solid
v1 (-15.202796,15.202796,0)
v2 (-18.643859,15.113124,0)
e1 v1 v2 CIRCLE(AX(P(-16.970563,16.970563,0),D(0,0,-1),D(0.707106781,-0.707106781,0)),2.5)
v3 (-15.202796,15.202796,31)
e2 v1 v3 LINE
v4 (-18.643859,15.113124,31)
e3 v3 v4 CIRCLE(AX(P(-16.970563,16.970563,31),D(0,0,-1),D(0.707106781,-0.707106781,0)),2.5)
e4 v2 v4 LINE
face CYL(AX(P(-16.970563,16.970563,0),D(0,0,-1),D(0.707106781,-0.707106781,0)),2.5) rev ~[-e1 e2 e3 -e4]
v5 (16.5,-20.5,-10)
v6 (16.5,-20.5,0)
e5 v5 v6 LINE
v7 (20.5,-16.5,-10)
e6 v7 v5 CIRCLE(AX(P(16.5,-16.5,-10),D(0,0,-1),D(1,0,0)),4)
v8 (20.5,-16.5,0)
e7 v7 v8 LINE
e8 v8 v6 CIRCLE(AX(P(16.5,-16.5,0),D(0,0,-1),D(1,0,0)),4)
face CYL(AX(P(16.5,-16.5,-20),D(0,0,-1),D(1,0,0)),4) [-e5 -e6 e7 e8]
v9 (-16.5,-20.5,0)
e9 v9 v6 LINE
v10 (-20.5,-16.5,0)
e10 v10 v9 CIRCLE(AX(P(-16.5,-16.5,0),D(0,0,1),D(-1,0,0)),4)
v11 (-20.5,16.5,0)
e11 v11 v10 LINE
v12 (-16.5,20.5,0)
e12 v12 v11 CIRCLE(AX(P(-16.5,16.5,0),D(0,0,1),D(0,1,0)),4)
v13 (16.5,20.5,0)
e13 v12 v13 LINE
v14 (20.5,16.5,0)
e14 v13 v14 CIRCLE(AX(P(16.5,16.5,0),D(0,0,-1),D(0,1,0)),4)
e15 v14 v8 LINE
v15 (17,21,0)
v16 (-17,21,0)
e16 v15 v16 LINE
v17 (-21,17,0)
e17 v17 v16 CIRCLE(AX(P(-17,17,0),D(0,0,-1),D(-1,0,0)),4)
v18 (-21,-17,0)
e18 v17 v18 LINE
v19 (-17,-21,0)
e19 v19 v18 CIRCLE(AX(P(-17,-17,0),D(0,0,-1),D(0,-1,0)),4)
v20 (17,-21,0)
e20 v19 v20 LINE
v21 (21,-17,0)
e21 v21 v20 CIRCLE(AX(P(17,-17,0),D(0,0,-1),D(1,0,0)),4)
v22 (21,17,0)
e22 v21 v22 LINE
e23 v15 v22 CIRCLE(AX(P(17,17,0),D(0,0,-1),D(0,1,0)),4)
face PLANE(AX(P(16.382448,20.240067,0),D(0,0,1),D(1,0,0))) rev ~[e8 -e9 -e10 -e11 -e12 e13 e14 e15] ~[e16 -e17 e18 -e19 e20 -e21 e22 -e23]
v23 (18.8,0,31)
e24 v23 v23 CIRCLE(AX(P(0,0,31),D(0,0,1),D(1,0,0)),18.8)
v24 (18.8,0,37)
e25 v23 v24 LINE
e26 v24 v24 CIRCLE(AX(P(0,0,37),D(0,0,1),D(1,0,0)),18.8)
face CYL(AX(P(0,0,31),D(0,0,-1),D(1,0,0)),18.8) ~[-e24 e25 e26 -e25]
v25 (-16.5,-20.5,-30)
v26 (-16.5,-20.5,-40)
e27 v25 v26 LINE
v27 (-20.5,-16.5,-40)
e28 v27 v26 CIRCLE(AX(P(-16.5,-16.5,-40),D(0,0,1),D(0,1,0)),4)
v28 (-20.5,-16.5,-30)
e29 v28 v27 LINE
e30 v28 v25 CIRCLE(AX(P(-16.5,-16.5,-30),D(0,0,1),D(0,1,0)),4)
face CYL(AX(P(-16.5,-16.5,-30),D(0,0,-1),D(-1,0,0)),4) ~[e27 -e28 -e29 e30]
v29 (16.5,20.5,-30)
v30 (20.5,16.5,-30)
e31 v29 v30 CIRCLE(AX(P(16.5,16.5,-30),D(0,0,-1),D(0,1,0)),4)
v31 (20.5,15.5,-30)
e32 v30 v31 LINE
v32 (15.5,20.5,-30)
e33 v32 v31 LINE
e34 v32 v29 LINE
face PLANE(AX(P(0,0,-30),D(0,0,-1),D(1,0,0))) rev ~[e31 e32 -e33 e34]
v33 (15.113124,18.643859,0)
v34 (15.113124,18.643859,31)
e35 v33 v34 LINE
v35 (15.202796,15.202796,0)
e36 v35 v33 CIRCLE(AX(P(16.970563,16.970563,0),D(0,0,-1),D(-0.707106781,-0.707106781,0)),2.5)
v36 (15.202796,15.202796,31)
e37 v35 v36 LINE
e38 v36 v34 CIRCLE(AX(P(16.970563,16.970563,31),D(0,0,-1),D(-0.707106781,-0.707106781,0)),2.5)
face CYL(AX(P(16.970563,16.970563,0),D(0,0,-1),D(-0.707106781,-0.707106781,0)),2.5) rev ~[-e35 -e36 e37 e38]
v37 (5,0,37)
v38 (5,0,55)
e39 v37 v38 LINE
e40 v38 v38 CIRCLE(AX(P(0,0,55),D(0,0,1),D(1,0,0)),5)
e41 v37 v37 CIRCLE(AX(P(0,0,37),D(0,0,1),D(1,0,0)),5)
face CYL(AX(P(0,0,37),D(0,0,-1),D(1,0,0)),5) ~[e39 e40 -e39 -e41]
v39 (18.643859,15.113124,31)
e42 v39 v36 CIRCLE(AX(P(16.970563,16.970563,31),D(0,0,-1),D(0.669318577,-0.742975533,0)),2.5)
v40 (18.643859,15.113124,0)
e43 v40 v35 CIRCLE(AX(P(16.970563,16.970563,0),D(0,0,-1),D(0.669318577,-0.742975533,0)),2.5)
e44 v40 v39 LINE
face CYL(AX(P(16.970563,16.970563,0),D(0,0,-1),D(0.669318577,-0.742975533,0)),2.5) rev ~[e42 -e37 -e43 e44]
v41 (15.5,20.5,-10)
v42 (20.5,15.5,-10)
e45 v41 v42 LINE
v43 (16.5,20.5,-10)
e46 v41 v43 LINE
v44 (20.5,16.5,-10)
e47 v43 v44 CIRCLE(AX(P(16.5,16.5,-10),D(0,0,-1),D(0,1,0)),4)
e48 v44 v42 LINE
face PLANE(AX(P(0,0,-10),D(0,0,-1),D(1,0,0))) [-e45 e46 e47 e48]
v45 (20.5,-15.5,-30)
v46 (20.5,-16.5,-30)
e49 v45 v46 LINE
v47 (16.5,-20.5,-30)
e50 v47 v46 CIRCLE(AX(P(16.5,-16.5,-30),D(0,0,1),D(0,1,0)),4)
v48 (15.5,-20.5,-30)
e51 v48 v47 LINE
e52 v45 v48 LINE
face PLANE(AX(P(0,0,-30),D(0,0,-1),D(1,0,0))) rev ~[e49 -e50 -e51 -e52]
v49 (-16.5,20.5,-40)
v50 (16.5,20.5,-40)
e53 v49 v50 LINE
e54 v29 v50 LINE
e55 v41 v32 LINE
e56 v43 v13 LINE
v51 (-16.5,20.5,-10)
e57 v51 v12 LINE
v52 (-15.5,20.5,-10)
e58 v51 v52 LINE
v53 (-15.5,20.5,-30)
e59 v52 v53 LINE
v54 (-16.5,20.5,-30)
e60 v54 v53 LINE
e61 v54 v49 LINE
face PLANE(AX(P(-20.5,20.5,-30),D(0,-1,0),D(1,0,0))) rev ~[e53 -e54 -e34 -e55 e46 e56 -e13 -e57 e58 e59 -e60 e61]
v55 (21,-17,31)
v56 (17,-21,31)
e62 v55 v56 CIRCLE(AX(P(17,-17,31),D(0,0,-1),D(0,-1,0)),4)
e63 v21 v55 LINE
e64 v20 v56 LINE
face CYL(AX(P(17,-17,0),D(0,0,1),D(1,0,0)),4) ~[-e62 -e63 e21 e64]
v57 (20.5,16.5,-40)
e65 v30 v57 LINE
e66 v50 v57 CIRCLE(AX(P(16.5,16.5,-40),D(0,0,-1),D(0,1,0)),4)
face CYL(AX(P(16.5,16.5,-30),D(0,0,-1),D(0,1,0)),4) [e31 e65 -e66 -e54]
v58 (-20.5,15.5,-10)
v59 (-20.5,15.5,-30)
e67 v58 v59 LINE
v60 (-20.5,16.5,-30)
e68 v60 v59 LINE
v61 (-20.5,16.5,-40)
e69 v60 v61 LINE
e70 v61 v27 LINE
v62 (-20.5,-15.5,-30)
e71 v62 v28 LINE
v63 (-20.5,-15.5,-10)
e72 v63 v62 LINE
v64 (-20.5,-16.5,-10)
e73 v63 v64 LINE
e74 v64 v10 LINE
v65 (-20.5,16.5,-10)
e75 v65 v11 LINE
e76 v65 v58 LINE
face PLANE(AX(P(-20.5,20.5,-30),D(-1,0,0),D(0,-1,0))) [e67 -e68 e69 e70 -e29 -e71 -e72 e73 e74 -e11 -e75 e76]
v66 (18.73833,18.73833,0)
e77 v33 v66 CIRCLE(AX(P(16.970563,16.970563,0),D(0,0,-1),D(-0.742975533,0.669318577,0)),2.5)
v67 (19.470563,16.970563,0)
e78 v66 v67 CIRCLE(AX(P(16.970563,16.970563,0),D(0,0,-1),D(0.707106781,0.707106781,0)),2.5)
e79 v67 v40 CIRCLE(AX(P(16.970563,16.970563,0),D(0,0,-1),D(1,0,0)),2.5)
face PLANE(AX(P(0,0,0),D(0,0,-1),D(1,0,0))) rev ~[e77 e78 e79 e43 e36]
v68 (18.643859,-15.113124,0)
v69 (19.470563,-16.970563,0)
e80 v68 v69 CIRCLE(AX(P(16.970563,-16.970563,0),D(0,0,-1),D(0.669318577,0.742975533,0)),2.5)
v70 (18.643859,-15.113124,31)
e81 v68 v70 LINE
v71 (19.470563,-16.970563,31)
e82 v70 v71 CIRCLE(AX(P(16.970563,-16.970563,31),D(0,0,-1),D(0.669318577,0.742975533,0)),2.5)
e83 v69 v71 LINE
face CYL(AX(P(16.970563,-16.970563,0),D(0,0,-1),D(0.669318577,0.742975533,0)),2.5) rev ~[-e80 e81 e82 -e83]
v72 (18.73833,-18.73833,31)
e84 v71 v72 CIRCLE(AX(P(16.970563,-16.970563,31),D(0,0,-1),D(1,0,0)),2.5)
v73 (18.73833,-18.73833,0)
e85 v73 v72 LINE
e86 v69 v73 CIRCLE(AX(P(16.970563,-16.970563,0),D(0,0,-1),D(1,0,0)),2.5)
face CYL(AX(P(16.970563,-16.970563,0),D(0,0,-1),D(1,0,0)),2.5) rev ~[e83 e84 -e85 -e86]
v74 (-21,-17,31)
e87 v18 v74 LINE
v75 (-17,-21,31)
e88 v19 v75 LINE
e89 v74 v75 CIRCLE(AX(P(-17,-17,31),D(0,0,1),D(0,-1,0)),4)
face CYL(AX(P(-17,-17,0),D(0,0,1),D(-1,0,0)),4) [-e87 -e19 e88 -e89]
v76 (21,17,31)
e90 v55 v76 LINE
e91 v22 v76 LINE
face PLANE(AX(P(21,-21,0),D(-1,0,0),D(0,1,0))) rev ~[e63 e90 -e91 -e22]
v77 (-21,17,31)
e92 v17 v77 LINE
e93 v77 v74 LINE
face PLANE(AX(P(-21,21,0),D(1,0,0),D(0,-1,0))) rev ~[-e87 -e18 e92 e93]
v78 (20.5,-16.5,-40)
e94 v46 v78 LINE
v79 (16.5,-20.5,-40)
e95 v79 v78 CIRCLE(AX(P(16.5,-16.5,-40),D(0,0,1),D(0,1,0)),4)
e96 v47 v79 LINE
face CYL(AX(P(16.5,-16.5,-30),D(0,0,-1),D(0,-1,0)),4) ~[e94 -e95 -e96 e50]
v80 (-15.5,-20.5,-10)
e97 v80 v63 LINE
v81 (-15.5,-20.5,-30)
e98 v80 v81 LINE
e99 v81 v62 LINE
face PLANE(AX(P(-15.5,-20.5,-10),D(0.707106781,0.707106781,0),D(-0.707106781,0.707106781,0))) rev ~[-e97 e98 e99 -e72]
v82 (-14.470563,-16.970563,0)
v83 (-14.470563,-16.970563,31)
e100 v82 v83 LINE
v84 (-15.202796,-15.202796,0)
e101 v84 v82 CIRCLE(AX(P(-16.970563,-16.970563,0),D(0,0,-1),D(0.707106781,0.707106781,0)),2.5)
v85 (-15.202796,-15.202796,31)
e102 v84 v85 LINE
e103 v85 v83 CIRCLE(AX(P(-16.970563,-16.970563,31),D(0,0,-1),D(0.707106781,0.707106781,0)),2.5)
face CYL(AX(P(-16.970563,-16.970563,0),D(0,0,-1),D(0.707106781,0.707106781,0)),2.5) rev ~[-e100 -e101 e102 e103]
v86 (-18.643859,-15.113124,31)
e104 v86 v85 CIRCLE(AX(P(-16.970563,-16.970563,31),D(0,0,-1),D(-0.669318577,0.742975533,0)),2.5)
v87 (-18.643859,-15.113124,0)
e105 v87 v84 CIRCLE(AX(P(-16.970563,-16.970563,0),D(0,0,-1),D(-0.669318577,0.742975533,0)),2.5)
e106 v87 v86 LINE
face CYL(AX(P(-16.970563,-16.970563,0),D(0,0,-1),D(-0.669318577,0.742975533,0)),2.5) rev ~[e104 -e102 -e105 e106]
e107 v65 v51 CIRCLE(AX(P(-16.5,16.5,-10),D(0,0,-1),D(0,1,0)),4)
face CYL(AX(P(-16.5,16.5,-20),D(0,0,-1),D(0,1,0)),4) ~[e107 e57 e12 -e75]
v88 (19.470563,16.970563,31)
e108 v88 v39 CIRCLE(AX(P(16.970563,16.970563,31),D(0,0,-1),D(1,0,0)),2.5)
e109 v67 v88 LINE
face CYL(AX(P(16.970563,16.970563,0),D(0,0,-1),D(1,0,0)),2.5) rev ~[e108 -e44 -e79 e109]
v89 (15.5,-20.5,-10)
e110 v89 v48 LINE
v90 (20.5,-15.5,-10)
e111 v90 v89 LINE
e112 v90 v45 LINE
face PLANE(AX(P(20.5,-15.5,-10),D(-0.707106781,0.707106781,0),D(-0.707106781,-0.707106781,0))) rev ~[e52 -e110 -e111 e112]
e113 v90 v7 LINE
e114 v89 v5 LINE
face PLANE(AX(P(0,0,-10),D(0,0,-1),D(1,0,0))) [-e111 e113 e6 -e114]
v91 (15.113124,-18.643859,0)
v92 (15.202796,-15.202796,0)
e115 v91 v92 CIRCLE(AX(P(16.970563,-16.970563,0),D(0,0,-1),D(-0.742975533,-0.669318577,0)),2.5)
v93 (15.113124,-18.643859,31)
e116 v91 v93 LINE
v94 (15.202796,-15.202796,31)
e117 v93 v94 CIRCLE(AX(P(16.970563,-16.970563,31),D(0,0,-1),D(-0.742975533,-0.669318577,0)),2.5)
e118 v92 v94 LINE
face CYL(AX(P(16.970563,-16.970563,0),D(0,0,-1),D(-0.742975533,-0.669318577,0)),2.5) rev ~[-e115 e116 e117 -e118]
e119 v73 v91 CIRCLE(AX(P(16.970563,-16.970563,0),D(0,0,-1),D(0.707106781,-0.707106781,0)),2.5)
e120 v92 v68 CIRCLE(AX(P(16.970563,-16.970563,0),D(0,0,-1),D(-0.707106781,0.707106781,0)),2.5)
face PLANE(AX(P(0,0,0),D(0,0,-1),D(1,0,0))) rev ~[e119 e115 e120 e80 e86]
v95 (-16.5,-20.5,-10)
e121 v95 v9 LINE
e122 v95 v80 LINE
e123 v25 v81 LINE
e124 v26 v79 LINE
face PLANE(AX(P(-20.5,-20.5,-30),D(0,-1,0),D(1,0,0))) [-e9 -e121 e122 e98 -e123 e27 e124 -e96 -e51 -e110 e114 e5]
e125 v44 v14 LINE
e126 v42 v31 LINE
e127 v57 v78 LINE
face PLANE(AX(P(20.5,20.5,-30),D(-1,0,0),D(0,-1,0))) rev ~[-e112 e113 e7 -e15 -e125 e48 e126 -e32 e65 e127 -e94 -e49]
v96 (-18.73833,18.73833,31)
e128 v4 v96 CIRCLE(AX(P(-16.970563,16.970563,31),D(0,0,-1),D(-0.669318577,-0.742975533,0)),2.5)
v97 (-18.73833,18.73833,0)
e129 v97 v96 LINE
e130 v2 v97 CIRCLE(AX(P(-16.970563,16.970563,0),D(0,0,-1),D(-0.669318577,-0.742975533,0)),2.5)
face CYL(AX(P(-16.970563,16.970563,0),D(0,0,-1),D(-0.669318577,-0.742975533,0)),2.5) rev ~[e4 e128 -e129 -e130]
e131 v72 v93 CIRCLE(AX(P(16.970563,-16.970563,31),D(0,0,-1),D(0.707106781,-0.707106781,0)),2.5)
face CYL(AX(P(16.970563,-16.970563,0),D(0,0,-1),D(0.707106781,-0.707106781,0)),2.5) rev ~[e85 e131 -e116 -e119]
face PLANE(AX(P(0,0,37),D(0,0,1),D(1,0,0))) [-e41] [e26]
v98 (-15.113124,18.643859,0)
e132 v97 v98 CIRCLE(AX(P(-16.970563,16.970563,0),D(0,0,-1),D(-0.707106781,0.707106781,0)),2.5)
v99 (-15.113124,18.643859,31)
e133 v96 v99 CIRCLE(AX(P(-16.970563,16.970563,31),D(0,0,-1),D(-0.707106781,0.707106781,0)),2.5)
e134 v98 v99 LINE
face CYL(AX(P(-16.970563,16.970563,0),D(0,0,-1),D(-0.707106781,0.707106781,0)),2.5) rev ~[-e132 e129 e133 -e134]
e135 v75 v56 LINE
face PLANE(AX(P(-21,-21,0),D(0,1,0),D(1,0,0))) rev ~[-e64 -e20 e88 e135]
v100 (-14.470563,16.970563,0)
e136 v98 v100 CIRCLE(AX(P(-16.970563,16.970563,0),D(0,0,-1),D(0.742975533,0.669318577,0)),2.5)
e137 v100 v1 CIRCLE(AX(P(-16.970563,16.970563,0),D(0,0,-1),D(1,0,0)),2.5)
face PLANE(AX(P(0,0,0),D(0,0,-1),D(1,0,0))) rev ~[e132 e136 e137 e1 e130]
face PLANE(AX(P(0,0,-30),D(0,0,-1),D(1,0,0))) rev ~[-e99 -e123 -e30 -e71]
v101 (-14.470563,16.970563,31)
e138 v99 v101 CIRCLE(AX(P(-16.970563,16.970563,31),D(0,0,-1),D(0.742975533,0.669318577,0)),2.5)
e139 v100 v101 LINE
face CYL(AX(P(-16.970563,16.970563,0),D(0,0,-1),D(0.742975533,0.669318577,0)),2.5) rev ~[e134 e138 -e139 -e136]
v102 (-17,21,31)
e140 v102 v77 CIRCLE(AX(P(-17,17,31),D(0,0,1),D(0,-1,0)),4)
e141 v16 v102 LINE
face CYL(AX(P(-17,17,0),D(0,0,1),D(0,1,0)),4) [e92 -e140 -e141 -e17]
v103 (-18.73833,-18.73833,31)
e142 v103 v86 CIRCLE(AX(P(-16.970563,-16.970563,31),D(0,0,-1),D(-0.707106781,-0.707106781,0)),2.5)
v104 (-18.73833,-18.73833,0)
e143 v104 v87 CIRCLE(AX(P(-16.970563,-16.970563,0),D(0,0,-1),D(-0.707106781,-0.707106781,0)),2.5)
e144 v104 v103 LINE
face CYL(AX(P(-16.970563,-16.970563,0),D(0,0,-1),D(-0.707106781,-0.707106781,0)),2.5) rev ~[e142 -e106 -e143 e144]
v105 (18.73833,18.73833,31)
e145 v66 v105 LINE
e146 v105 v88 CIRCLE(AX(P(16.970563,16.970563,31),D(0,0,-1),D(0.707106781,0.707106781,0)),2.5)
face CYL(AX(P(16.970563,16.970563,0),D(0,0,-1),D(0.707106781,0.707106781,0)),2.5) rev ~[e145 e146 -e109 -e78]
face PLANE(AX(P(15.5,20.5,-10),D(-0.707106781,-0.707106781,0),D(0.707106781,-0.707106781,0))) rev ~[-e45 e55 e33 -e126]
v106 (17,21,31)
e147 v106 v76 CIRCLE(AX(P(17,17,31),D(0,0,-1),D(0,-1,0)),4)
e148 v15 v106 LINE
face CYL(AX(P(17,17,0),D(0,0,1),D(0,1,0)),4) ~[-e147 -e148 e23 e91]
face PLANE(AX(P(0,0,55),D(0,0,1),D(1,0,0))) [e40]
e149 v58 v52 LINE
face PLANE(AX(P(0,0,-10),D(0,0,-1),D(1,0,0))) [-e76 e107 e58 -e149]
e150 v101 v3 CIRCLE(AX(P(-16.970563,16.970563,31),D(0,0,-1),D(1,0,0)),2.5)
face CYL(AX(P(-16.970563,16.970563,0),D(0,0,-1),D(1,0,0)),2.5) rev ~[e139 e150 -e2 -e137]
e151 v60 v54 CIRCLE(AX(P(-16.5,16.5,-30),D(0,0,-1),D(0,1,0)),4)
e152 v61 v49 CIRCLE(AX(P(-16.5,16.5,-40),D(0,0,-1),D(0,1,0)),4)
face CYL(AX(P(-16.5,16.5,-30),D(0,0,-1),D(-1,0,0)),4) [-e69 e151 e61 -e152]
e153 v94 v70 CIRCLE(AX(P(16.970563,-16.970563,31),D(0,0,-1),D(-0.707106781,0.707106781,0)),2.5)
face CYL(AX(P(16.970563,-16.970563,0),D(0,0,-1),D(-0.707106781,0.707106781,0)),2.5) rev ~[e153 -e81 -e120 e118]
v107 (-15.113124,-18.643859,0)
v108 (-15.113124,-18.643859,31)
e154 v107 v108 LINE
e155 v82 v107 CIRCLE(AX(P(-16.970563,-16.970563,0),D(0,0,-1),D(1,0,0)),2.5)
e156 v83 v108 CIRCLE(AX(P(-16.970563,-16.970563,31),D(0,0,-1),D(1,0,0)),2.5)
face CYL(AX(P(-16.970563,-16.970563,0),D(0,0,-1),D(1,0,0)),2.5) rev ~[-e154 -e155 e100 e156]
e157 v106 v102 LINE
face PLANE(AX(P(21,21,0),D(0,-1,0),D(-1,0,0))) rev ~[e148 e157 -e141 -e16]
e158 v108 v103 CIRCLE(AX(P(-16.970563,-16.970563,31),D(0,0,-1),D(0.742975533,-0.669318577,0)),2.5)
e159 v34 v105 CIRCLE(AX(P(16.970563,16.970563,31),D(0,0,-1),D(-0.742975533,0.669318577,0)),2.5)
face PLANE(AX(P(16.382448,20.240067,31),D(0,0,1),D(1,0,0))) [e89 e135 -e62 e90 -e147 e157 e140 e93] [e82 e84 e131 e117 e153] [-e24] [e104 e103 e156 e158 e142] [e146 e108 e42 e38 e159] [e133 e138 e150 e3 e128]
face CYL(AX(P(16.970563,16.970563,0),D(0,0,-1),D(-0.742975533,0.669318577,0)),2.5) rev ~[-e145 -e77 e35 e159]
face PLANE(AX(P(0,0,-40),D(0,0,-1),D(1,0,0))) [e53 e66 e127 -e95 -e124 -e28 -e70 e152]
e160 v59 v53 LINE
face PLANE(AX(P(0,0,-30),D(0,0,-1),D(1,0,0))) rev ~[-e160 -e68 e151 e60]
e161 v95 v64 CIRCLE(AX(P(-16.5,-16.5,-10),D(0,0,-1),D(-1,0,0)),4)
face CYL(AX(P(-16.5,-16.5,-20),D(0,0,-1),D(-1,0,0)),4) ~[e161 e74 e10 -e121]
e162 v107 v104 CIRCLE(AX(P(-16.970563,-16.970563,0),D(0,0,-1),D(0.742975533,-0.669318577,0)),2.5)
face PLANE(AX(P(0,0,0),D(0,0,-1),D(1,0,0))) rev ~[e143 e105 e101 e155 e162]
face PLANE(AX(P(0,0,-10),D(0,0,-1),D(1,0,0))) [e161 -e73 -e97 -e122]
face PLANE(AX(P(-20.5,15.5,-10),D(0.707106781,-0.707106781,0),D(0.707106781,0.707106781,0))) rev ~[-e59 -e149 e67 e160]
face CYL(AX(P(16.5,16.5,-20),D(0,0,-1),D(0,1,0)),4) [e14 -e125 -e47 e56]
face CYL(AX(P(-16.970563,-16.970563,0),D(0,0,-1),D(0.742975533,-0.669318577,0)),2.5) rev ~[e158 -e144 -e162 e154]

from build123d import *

# Parameters (mm, degrees)
F1_DEPTH     = 31
F2_R         = 18.8
F3_DEPTH     = 6
F4_R         = 5
F5_DEPTH     = 18
F6_R         = 4
F8_W         = 41
F8_H         = 41
F9_DEPTH     = 10
F10_T1_DEPTH = 20
F12_DEPTH    = 20
F13_W        = 41
F13_H        = 41
F14_DEPTH    = 10
F15_R        = 4


# Not quite as in the source:
# - a fillet or chamfer that OpenCascade refuses, or shapes differently, is made with other operations: its cross-section is extruded or revolved along the edge and cut away or added


with BuildPart() as f1:
    # F0 (on Top) → F1 (new body)
    with BuildSketch(Plane.XY):
        with BuildLine():
            Line((18.7383297014, 18.7383297014), (21, 21))
            Line((21, 21), (11.6189500386, 21))
            ThreePointArc((11.6189500386, 21), (13.4178535673, 19.8987739735), (15.1131239157, 18.6438591903))
            ThreePointArc((15.1131239157, 18.6438591903), (16.9054364798, 19.4697143183), (18.7383297014, 18.7383297014))
        make_face()
        with BuildLine():
            ThreePointArc((-15.1131239157, 18.6438591903), (-13.4178535673, 19.8987739735), (-11.6189500386, 21))
            Line((-11.6189500386, 21), (-21, 21))
            Line((-21, 21), (-18.7383297014, 18.7383297014))
            ThreePointArc((-18.7383297014, 18.7383297014), (-16.9054364798, 19.4697143183), (-15.1131239157, 18.6438591903))
        make_face()
        with BuildLine():
            Line((11.6189500386, -21), (21, -21))
            Line((21, -21), (18.7383297014, -18.7383297014))
            ThreePointArc((18.7383297014, -18.7383297014), (16.9054364798, -19.4697143183), (15.1131239157, -18.6438591903))
            ThreePointArc((15.1131239157, -18.6438591903), (13.4178535673, -19.8987739735), (11.6189500386, -21))
        make_face()
        with BuildLine():
            Line((-21, -21), (-11.6189500386, -21))
            ThreePointArc((-11.6189500386, -21), (-13.4178535673, -19.8987739735), (-15.1131239157, -18.6438591903))
            ThreePointArc((-15.1131239157, -18.6438591903), (-16.9054364798, -19.4697143183), (-18.7383297014, -18.7383297014))
            Line((-18.7383297014, -18.7383297014), (-21, -21))
        make_face()
        with BuildLine():
            Line((21, 11.6189500386), (21, 21))
            Line((21, 21), (18.7383297014, 18.7383297014))
            ThreePointArc((18.7383297014, 18.7383297014), (19.2802615798, 17.9272713294), (19.4705627485, 16.9705627485))
            ThreePointArc((19.4705627485, 16.9705627485), (19.2545549885, 15.954010021), (18.6438591903, 15.1131239157))
            ThreePointArc((18.6438591903, 15.1131239157), (19.8987739735, 13.4178535673), (21, 11.6189500386))
        make_face()
        with BuildLine():
            Line((21, -21), (21, -11.6189500386))
            ThreePointArc((21, -11.6189500386), (19.8987739735, -13.4178535673), (18.6438591903, -15.1131239157))
            ThreePointArc((18.6438591903, -15.1131239157), (19.2545549885, -15.954010021), (19.4705627485, -16.9705627485))
            ThreePointArc((19.4705627485, -16.9705627485), (19.2802615798, -17.9272713294), (18.7383297014, -18.7383297014))
            Line((18.7383297014, -18.7383297014), (21, -21))
        make_face()
        with BuildLine():
            Line((-18.7383297014, 18.7383297014), (-21, 21))
            Line((-21, 21), (-21, 11.6189500386))
            ThreePointArc((-21, 11.6189500386), (-19.8987739735, 13.4178535673), (-18.6438591903, 15.1131239157))
            ThreePointArc((-18.6438591903, 15.1131239157), (-19.4697143183, 16.9054364798), (-18.7383297014, 18.7383297014))
        make_face()
        with BuildLine():
            ThreePointArc((-18.6438591903, -15.1131239157), (-19.8987739735, -13.4178535673), (-21, -11.6189500386))
            Line((-21, -11.6189500386), (-21, -21))
            Line((-21, -21), (-18.7383297014, -18.7383297014))
            ThreePointArc((-18.7383297014, -18.7383297014), (-19.4697143183, -16.9054364798), (-18.6438591903, -15.1131239157))
        make_face()
        with BuildLine():
            ThreePointArc((15.1131239157, 18.6438591903), (13.4178535673, 19.8987739735), (11.6189500386, 21))
            Line((11.6189500386, 21), (-11.6189500386, 21))
            ThreePointArc((-11.6189500386, 21), (-13.4178535673, 19.8987739735), (-15.1131239157, 18.6438591903))
            ThreePointArc((-15.1131239157, 18.6438591903), (-14.6367250204, 17.8667778225), (-14.4705627485, 16.9705627485))
            ThreePointArc((-14.4705627485, 16.9705627485), (-14.6608639172, 16.0138541676), (-15.2027957955, 15.2027957955))
            Line((-15.2027957955, 15.2027957955), (0, 0))
            Line((0, 0), (15.2027957955, 15.2027957955))
            ThreePointArc((15.2027957955, 15.2027957955), (14.4714111786, 16.9054364798), (15.1131239157, 18.6438591903))
        make_face()
        with BuildLine():
            Line((15.2027957955, -15.2027957955), (0, 0))
            Line((0, 0), (-15.2027957955, -15.2027957955))
            ThreePointArc((-15.2027957955, -15.2027957955), (-14.6608639172, -16.0138541676), (-14.4705627485, -16.9705627485))
            ThreePointArc((-14.4705627485, -16.9705627485), (-14.6367250204, -17.8667778225), (-15.1131239157, -18.6438591903))
            ThreePointArc((-15.1131239157, -18.6438591903), (-13.4178535673, -19.8987739735), (-11.6189500386, -21))
            Line((-11.6189500386, -21), (11.6189500386, -21))
            ThreePointArc((11.6189500386, -21), (13.4178535673, -19.8987739735), (15.1131239157, -18.6438591903))
            ThreePointArc((15.1131239157, -18.6438591903), (14.4714111786, -16.9054364798), (15.2027957955, -15.2027957955))
        make_face()
        with BuildLine():
            Line((21, -11.6189500386), (21, 11.6189500386))
            ThreePointArc((21, 11.6189500386), (19.8987739735, 13.4178535673), (18.6438591903, 15.1131239157))
            ThreePointArc((18.6438591903, 15.1131239157), (16.9054364798, 14.4714111786), (15.2027957955, 15.2027957955))
            Line((15.2027957955, 15.2027957955), (0, 0))
            Line((0, 0), (15.2027957955, -15.2027957955))
            ThreePointArc((15.2027957955, -15.2027957955), (16.9054364798, -14.4714111786), (18.6438591903, -15.1131239157))
            ThreePointArc((18.6438591903, -15.1131239157), (19.8987739735, -13.4178535673), (21, -11.6189500386))
        make_face()
        with BuildLine():
            ThreePointArc((-18.6438591903, 15.1131239157), (-19.8987739735, 13.4178535673), (-21, 11.6189500386))
            Line((-21, 11.6189500386), (-21, -11.6189500386))
            ThreePointArc((-21, -11.6189500386), (-19.8987739735, -13.4178535673), (-18.6438591903, -15.1131239157))
            ThreePointArc((-18.6438591903, -15.1131239157), (-16.9054364798, -14.4714111786), (-15.2027957955, -15.2027957955))
            Line((-15.2027957955, -15.2027957955), (0, 0))
            Line((0, 0), (-15.2027957955, 15.2027957955))
            ThreePointArc((-15.2027957955, 15.2027957955), (-16.9054364798, 14.4714111786), (-18.6438591903, 15.1131239157))
        make_face()
    extrude(amount=F1_DEPTH)

    # F2 (on face) → F3 (join)
    with BuildSketch(Plane.XY.offset(31)):
        Circle(F2_R)
    extrude(amount=F3_DEPTH)

    # F4 (on face) → F5 (join)
    with BuildSketch(Plane.XY.offset(37)):
        Circle(F4_R)
    extrude(amount=F5_DEPTH)

    # F6
    f6_edges = [f1.edges().sort_by_distance(p)[0] for p in [
        (-21, -21, 15.5),
        (-21, 21, 15.5),
        (21, 21, 15.5),
        (21, -21, 15.5),
    ]]
    fillet(f6_edges, radius=F6_R)

    # F8 (on face) → F9 (join)
    with BuildSketch(Plane(origin=(0, 0, 0), x_dir=(1, 0, 0), z_dir=(0, 0, -1))):
        Rectangle(F8_W, F8_H)
    extrude(amount=F9_DEPTH)

    # F10: fillet of radius 4 on 4 edges, made by hand

    # F10_s2 → F10_t1 (cut)
    with BuildSketch(Plane.XY.offset(-20)):
        with BuildLine():
            ThreePointArc((20.5, -16.5), (19.3284271247, -19.3284271247), (16.5, -20.5))
            Line((16.5, -20.5), (20.5, -20.5))
            Line((20.5, -20.5), (20.5, -16.5))
        make_face()
        with BuildLine():
            ThreePointArc((16.5, 20.5), (19.3284271247, 19.3284271247), (20.5, 16.5))
            Line((20.5, 16.5), (20.5, 20.5))
            Line((20.5, 20.5), (16.5, 20.5))
        make_face()
        with BuildLine():
            ThreePointArc((-16.5, 20.5), (-19.3284271247, 19.3284271247), (-20.5, 16.5))
            Line((-20.5, 16.5), (-20.5, 20.5))
            Line((-20.5, 20.5), (-16.5, 20.5))
        make_face()
        with BuildLine():
            ThreePointArc((-20.5, -16.5), (-19.3284271247, -19.3284271247), (-16.5, -20.5))
            Line((-16.5, -20.5), (-20.5, -20.5))
            Line((-20.5, -20.5), (-20.5, -16.5))
        make_face()
    extrude(amount=F10_T1_DEPTH, mode=Mode.SUBTRACT)

    # F11 (on face) → F12 (join)
    with BuildSketch(Plane(origin=(0, 0, -10), x_dir=(1, 0, 0), z_dir=(0, 0, -1))):
        Polygon((-15.5, 20.5), (-20.5, 15.5), (-15.5, 15.5), align=None)
        Polygon((15.5, 15.5), (20.5, 15.5), (15.5, 20.5), align=None)
        Polygon((15.5, -15.5), (15.5, -20.5), (20.5, -15.5), align=None)
        Polygon((-20.5, -15.5), (-15.5, -20.5), (-15.5, -15.5), align=None)
        Polygon((-15.5, -20.5), (15.5, -20.5), (15.5, -15.5), (20.5, -15.5), (20.5, 15.5), (15.5, 15.5), (15.5, 20.5), (-15.5, 20.5), (-15.5, 15.5), (-20.5, 15.5), (-20.5, -15.5), (-15.5, -15.5), align=None)
    extrude(amount=F12_DEPTH)

    # F13 (on face) → F14 (join)
    with BuildSketch(Plane(origin=(0, 0, -30), x_dir=(1, 0, 0), z_dir=(0, 0, -1))):
        Rectangle(F13_W, F13_H)
    extrude(amount=F14_DEPTH)

    # F15
    f15_edges = [f1.edges().sort_by_distance(p)[0] for p in [
        (20.5, -20.5, -35),
        (-20.5, -20.5, -35),
        (20.5, 20.5, -35),
        (-20.5, 20.5, -35),
    ]]
    fillet(f15_edges, radius=F15_R)


solid = f1.part
